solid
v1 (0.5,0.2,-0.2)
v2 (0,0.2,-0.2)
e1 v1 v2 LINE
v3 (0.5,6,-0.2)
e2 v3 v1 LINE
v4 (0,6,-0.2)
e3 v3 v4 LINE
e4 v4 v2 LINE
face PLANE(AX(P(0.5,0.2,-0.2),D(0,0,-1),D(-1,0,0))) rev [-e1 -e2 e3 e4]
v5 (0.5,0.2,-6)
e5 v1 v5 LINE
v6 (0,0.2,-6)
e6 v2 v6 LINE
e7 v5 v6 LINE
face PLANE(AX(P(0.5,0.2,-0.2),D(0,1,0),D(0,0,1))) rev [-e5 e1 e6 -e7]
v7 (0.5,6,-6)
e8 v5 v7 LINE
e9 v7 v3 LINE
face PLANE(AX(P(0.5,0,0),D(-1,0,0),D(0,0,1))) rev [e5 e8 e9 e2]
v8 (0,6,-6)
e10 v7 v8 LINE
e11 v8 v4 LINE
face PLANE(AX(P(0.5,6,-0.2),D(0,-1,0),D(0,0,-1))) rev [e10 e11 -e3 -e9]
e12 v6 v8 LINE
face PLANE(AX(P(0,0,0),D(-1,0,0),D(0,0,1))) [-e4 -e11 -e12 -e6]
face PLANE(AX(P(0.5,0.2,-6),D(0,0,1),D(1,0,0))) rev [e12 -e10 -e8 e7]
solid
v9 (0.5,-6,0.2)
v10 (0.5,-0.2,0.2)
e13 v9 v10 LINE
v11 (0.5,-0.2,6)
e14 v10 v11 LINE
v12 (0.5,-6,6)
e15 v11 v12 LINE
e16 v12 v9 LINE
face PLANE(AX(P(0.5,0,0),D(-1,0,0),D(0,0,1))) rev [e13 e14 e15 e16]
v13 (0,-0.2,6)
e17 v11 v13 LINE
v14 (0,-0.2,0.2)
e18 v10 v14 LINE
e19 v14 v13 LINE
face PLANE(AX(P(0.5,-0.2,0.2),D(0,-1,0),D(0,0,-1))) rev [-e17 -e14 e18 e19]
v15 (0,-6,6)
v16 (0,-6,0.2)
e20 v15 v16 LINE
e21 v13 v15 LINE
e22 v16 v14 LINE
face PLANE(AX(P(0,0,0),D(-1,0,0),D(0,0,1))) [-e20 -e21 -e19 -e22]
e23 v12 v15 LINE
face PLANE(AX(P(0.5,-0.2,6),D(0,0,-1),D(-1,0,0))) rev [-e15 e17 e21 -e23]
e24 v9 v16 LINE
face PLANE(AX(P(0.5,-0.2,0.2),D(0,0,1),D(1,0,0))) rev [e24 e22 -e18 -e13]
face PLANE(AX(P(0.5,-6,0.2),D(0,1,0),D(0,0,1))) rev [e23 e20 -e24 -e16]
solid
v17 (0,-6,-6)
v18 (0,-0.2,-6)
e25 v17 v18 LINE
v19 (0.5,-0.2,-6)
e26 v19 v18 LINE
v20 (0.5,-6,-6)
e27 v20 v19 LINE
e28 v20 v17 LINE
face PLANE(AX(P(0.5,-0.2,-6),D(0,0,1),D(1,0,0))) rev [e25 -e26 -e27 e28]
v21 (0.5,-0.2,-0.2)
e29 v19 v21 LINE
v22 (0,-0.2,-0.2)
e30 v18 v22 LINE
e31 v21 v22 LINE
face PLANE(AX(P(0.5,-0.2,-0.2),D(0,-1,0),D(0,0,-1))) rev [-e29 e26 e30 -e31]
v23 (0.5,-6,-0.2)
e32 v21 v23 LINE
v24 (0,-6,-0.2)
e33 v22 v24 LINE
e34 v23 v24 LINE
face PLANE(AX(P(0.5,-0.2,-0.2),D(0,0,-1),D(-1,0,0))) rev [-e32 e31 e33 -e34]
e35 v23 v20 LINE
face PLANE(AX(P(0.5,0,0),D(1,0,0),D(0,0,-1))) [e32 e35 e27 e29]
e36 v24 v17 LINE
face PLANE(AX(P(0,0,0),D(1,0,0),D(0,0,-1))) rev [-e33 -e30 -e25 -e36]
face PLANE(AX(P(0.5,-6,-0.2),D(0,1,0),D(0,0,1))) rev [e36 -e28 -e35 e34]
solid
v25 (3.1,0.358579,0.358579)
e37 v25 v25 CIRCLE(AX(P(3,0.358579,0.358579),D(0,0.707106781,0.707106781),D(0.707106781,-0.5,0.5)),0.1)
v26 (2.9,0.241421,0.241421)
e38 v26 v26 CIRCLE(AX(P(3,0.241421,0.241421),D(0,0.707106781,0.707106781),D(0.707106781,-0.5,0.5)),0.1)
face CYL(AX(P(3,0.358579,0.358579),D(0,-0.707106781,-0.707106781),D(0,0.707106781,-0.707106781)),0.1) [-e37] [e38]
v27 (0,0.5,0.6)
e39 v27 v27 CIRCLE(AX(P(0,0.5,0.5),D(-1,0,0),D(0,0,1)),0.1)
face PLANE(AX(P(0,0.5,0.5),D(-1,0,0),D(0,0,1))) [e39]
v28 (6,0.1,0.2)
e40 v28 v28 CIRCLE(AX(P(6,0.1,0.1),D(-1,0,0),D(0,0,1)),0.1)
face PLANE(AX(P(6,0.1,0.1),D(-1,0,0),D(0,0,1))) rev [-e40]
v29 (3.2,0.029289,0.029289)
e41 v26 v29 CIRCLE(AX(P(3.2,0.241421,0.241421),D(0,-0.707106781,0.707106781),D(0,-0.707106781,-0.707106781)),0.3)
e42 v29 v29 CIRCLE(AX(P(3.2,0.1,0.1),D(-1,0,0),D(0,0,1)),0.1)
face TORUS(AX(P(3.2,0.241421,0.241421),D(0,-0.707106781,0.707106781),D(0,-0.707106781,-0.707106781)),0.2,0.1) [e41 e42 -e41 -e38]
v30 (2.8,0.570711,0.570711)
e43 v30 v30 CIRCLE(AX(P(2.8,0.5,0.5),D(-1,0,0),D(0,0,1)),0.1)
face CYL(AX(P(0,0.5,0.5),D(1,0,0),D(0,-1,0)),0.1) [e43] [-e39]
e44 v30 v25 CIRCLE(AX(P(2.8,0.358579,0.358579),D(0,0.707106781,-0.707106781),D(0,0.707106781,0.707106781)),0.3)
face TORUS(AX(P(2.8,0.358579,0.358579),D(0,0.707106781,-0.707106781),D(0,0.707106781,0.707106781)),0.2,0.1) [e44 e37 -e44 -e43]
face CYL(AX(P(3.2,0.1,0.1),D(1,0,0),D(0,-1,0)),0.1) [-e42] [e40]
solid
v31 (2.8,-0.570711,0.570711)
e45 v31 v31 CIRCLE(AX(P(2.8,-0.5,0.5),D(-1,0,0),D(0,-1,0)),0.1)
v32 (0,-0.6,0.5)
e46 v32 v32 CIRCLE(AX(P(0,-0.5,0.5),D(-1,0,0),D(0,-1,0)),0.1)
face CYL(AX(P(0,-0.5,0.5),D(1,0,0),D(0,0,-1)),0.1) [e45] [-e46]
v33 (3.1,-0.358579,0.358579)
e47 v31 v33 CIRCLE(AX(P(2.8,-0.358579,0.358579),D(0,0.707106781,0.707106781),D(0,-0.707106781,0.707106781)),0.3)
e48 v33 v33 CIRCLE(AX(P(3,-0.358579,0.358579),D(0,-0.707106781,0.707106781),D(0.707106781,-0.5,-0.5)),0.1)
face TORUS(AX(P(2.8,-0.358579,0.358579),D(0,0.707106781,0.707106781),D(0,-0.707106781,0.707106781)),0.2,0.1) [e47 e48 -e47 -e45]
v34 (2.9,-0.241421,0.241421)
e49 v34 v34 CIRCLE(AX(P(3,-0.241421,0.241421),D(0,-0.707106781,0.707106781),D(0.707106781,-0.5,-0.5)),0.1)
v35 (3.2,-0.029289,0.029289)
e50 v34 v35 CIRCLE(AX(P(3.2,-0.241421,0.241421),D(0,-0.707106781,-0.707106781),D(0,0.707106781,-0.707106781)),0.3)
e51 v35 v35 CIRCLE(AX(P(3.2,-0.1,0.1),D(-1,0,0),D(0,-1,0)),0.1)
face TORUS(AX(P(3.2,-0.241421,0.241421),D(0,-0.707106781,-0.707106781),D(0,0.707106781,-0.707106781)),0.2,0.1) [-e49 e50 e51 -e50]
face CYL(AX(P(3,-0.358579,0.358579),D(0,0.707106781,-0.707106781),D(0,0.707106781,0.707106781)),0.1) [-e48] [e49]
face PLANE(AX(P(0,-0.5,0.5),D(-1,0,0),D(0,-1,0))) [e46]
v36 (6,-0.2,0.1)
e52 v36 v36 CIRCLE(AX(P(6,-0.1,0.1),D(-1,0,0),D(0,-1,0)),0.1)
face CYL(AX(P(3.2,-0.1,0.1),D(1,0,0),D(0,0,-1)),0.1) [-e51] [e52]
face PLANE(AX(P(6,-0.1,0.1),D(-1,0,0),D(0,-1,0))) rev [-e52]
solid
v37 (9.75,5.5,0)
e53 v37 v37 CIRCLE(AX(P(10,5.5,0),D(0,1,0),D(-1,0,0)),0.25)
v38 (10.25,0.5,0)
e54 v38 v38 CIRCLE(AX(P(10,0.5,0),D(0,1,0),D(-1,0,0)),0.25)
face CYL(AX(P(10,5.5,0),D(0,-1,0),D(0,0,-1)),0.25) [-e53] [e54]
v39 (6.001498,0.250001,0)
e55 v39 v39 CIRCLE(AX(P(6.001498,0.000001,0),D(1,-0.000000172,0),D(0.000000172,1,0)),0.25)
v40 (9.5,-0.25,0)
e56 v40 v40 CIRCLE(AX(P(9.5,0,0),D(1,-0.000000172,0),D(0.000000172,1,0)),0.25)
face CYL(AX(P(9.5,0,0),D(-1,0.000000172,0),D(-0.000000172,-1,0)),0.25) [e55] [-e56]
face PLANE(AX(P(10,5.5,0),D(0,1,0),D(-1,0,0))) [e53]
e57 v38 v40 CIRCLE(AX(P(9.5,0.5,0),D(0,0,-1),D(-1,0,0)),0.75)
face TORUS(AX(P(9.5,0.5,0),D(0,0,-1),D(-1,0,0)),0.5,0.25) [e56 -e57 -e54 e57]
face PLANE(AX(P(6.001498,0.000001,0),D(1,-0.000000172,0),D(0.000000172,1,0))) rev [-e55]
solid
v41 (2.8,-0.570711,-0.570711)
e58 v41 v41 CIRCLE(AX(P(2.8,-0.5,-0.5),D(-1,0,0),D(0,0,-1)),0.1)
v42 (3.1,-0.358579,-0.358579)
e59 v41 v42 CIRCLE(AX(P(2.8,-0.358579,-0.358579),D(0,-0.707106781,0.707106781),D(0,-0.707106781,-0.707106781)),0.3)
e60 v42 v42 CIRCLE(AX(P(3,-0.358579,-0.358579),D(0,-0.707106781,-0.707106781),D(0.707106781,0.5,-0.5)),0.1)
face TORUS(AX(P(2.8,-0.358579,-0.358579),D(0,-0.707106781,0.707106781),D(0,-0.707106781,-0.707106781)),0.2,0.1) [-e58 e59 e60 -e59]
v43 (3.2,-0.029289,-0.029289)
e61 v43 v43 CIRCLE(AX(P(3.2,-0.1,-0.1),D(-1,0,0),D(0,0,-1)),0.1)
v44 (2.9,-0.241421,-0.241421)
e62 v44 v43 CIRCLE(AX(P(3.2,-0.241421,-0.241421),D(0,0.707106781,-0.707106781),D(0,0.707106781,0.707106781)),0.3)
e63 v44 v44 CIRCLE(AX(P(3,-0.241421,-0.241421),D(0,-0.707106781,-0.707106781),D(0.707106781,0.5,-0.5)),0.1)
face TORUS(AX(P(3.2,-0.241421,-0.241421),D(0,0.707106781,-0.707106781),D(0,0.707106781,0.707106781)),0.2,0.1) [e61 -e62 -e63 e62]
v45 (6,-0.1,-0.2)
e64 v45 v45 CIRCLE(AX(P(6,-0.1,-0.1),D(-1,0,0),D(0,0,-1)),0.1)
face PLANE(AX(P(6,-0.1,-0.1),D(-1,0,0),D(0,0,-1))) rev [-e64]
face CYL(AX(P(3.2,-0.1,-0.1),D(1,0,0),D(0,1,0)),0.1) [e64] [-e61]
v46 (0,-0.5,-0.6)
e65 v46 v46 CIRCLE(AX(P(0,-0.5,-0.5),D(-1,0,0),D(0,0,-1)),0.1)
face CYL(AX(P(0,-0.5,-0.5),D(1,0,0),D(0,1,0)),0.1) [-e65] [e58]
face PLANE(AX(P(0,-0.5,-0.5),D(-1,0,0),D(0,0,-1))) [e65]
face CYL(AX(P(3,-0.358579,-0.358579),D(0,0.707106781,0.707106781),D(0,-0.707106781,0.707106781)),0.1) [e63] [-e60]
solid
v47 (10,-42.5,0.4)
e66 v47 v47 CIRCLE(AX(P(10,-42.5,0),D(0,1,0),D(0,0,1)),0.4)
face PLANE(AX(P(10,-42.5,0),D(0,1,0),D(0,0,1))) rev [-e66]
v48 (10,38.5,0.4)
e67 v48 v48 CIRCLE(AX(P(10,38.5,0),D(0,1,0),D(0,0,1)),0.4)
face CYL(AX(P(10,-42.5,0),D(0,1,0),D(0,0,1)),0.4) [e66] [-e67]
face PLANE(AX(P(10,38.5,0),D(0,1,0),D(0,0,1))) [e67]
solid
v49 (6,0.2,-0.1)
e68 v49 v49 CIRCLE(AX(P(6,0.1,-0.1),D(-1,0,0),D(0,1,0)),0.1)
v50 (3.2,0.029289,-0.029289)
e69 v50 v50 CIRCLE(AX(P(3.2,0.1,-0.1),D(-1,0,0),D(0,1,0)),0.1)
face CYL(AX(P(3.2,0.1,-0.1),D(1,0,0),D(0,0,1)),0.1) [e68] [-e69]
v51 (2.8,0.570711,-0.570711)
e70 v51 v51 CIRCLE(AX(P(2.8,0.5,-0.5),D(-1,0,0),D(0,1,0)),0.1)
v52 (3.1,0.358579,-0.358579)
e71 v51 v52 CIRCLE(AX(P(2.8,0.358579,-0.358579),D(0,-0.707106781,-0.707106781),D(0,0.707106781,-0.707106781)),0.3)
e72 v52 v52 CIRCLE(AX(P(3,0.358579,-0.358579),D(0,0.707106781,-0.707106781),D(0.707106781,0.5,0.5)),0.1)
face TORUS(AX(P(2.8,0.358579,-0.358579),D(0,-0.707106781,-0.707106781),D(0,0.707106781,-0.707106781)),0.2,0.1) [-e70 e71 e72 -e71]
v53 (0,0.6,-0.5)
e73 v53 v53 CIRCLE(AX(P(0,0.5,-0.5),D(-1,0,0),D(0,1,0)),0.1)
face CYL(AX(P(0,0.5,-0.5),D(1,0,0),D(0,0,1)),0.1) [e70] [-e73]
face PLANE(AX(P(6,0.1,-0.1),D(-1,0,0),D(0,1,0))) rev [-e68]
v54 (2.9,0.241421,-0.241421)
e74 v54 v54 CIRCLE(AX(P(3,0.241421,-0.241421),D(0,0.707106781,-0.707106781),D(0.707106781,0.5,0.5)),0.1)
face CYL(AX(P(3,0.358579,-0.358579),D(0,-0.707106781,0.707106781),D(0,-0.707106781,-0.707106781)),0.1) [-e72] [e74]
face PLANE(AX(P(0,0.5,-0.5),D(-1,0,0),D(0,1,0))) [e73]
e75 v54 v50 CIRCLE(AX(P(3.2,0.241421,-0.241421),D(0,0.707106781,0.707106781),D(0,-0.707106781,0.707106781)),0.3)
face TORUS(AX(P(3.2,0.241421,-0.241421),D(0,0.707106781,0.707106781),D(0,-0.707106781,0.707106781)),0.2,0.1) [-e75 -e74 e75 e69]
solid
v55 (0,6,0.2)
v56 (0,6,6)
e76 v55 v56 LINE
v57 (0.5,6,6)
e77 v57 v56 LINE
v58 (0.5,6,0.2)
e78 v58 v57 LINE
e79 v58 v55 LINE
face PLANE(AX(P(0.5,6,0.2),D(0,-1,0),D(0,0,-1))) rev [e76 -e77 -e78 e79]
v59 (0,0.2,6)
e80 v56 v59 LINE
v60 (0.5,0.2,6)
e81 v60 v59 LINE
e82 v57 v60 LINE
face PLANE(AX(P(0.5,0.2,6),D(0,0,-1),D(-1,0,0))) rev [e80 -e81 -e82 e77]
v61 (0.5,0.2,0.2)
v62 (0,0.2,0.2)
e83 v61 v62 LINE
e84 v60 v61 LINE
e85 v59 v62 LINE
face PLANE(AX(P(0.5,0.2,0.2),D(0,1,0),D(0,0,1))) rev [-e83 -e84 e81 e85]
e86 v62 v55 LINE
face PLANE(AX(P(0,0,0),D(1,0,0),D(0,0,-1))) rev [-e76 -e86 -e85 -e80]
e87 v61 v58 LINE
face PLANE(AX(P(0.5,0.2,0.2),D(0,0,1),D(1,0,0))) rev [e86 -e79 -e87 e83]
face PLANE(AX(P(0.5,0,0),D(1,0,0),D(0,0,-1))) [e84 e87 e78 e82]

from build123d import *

# Parameters (mm, degrees)
SKETCH_3_W               = 5.8
SKETCH_3_H               = 5.8
EXTRUDE_1_DEPTH          = 0.5
EXTRUDE_1_2_DEPTH        = 0.5
EXTRUDE_1_3_DEPTH        = 0.5
EXTRUDE_1_4_DEPTH        = 0.5
SWEEP_4_PROFILE_R        = 0.1
SWEEP_6_PROFILE_R        = 0.25
SWEEP_8_PROFILE_R        = 0.4
MOVE_BODY_3_OUTLINE_R    = 0.1
MOVE_BODY_3_ANGLE        = 90
MOVE_BODY_3_2_OUTLINE_R  = 0.1
MOVE_BODY_3_2_ANGLE      = 90
MOVE_BODY_3_3_OUTLINE_R  = 0.1
MOVE_BODY_3_3_DEPTH      = 2.8000001
MOVE_START               = 0.341421256
MOVE_BODY_3_4_OUTLINE_R  = 0.1
MOVE_BODY_3_4_DEPTH      = 0.165685625
MOVE_START_2             = 3.1999999
MOVE_BODY_3_5_OUTLINE_R  = 0.1
MOVE_BODY_3_5_DEPTH      = 2.8000001
MOVE_BODY_3_6_OUTLINE_R  = 0.1
MOVE_BODY_3_6_ANGLE      = 90
MOVE_BODY_3_7_OUTLINE_R  = 0.1
MOVE_BODY_3_7_ANGLE      = 90
MOVE_BODY_3_8_OUTLINE_R  = 0.1
MOVE_BODY_3_8_DEPTH      = 2.8000001
MOVE_BODY_3_9_OUTLINE_R  = 0.1
MOVE_BODY_3_9_DEPTH      = 0.165685625
MOVE_BODY_3_10_OUTLINE_R = 0.1
MOVE_BODY_3_10_DEPTH     = 2.8000001
MOVE_BODY_3_11_OUTLINE_R = 0.1
MOVE_BODY_3_11_ANGLE     = 90
MOVE_BODY_3_12_OUTLINE_R = 0.1
MOVE_BODY_3_12_ANGLE     = 90
MOVE_BODY_3_13_OUTLINE_R = 0.1
MOVE_BODY_3_13_DEPTH     = 2.8000001
MOVE_START_3             = -0.507106881
MOVE_BODY_3_14_OUTLINE_R = 0.1
MOVE_BODY_3_14_DEPTH     = 0.165685625
MOVE_BODY_3_15_OUTLINE_R = 0.1
MOVE_BODY_3_15_DEPTH     = 2.8000001


with BuildPart() as part:
    # 草图3 → 凸台-拉伸1 (new body)
    with BuildSketch(Plane(origin=(0, 0, 0), x_dir=(0, 0, -1), z_dir=(1, 0, 0))):
        with Locations((3.1, 3.1)):
            Rectangle(SKETCH_3_W, SKETCH_3_H)
    extrude(amount=EXTRUDE_1_DEPTH)


with BuildPart() as body_2:
    # 草图3 → Extrude 1 2 (new body)
    with BuildSketch(Plane(origin=(0, 0, 0), x_dir=(0, 0, -1), z_dir=(1, 0, 0))):
        with Locations((-3.1, -3.1)):
            Rectangle(SKETCH_3_W, SKETCH_3_H)
    extrude(amount=EXTRUDE_1_2_DEPTH)


with BuildPart() as body_3:
    # 草图3 → Extrude 1 3 (new body)
    with BuildSketch(Plane(origin=(0, 0, 0), x_dir=(0, 0, -1), z_dir=(1, 0, 0))):
        with Locations((3.1, -3.1)):
            Rectangle(SKETCH_3_W, SKETCH_3_H)
    extrude(amount=EXTRUDE_1_3_DEPTH)


with BuildPart() as body_4:
    # 草图3 → Extrude 1 4 (new body)
    with BuildSketch(Plane(origin=(0, 0, 0), x_dir=(0, 0, -1), z_dir=(1, 0, 0))):
        with Locations((-3.1, 3.1)):
            Rectangle(SKETCH_3_W, SKETCH_3_H)
    extrude(amount=EXTRUDE_1_4_DEPTH)


with BuildPart() as body_5:
    # 扫描4: sweep along a curve in space
    with BuildLine() as sweep_4_path:
        Line((0, -0.5, 0.5), (2.8, -0.5, 0.5))
        ThreePointArc((2.8, -0.5, 0.5), (2.941421356, -0.458578644, 0.458578644), (3, -0.358578644, 0.358578644))
        Line((3, -0.241421356, 0.241421356), (3, -0.358578644, 0.358578644))
        ThreePointArc((3.2, -0.1, 0.1), (3.058578644, -0.141421356, 0.141421356), (3, -0.241421356, 0.241421356))
        Line((3.2, -0.1, 0.1), (6, -0.1, 0.1))
    # 扫描4 profile (on start of the path) → 扫描4 (sweep)
    with BuildSketch(Plane(origin=(0, -0.5, 0.5), x_dir=(0, 0, 1), z_dir=(1, 0, 0))):
        Circle(SWEEP_4_PROFILE_R)
    sweep(path=sweep_4_path.line)


with BuildPart() as body_6:
    # 扫描6: sweep along a path in 草图31
    with BuildLine(Plane.XY) as sweep_6_path:
        Line((10, 5.5), (10, 0.5))
        ThreePointArc((10, 0.5), (9.85355336, 0.146446579), (9.499999914, 0))
        Line((9.499999914, 0), (6.001497631, 6.02e-07))
    # 扫描6 profile (on start of the path) → 扫描6 (sweep)
    with BuildSketch(Plane(origin=(10, 5.5, 0), x_dir=(0, 0, -1), z_dir=(0, -1, 0))):
        Circle(SWEEP_6_PROFILE_R)
    sweep(path=sweep_6_path.line)


with BuildPart() as body_7:
    # 扫描8: sweep along a path in 草图39
    with BuildLine(Plane.XY) as sweep_8_path:
        Line((10, -42.5), (10, 38.5))
    # 扫描8 profile (on start of the path) → 扫描8 (sweep)
    with BuildSketch(Plane(origin=(10, -42.5, 0), x_dir=(0, 0, 1), z_dir=(0, 1, 0))):
        Circle(SWEEP_8_PROFILE_R)
    sweep(path=sweep_8_path.line)


with BuildPart() as body_8:
    # Move Body 3: read off the stored shape, not the designer's step
    # Move Body 3 outline → Move Body 3 (revolve)
    with BuildSketch(Plane(origin=(2.8, 0.358578644, 0.358578644), x_dir=(0, 0.7071067811865401, 0.7071067811865551), z_dir=(-1, 0, 0))):
        with Locations((0.2, 0)):
            Circle(MOVE_BODY_3_OUTLINE_R)
    revolve(axis=Axis((2.8, 0.358578644, 0.358578644), (0, 0.7071067811865555, -0.7071067811865405)), revolution_arc=MOVE_BODY_3_ANGLE)

    # Move Body 3 2 outline → Move Body 3 2 (revolve)
    with BuildSketch(Plane(origin=(3.2, 0.241421356, 0.241421356), x_dir=(1.3934999695075554e-15, -0.7071067811865401, -0.7071067811865551), z_dir=(1, 0, 0))):
        with Locations((0.2, 0)):
            Circle(MOVE_BODY_3_2_OUTLINE_R)
    revolve(axis=Axis((3.2, 0.241421356, 0.241421356), (0, 0.7071067811865555, -0.7071067811865405)), revolution_arc=MOVE_BODY_3_2_ANGLE)

    # Move Body 3 3 outline → Move Body 3 3 (add)
    with BuildSketch(Plane.YZ):
        with Locations((0.5, 0.5)):
            Circle(MOVE_BODY_3_3_OUTLINE_R)
    extrude(amount=MOVE_BODY_3_3_DEPTH)

    # Move Body 3 4 outline → Move Body 3 4 (add)
    with BuildSketch(Plane(origin=(0, 0, 0), x_dir=(1, 0, 0), z_dir=(0, 0.70710678118654, 0.707106781186555)).offset(MOVE_START)):
        with Locations((3, 0)):
            Circle(MOVE_BODY_3_4_OUTLINE_R)
    extrude(amount=MOVE_BODY_3_4_DEPTH)

    # Move Body 3 5 outline → Move Body 3 5 (add)
    with BuildSketch(Plane.YZ.offset(MOVE_START_2)):
        with Locations((0.1, 0.1)):
            Circle(MOVE_BODY_3_5_OUTLINE_R)
    extrude(amount=MOVE_BODY_3_5_DEPTH)


with BuildPart() as body_9:
    # Move Body 3 6 outline → Move Body 3 6 (revolve)
    with BuildSketch(Plane(origin=(2.8, 0.358578644, -0.358578644), x_dir=(1, 0, 0), z_dir=(0, -0.707106781186552, 0.707106781186543))):
        with Locations((0.2, 0)):
            Circle(MOVE_BODY_3_6_OUTLINE_R)
    revolve(axis=Axis((2.8, 0.358578644, -0.358578644), (0, 0.707106781186543, 0.707106781186552)), revolution_arc=MOVE_BODY_3_6_ANGLE)

    # Move Body 3 7 outline → Move Body 3 7 (revolve)
    with BuildSketch(Plane(origin=(3.2, 0.241421356, -0.241421356), x_dir=(-1, 0, 0), z_dir=(-1.0106430996148604e-15, 0.707106781186552, -0.707106781186543))):
        with Locations((0.2, 0)):
            Circle(MOVE_BODY_3_7_OUTLINE_R)
    revolve(axis=Axis((3.2, 0.241421356, -0.241421356), (0, 0.707106781186543, 0.707106781186552)), revolution_arc=MOVE_BODY_3_7_ANGLE)

    # Move Body 3 8 outline → Move Body 3 8 (add)
    with BuildSketch(Plane.YZ):
        with Locations((0.5, -0.5)):
            Circle(MOVE_BODY_3_8_OUTLINE_R)
    extrude(amount=MOVE_BODY_3_8_DEPTH)

    # Move Body 3 9 outline → Move Body 3 9 (add)
    with BuildSketch(Plane(origin=(0, 0, 0), x_dir=(1, 0, 0), z_dir=(0, 0.707106781186552, -0.707106781186543)).offset(MOVE_START)):
        with Locations((3, 0)):
            Circle(MOVE_BODY_3_9_OUTLINE_R)
    extrude(amount=MOVE_BODY_3_9_DEPTH)

    # Move Body 3 10 outline → Move Body 3 10 (add)
    with BuildSketch(Plane.YZ.offset(MOVE_START_2)):
        with Locations((0.1, -0.1)):
            Circle(MOVE_BODY_3_10_OUTLINE_R)
    extrude(amount=MOVE_BODY_3_10_DEPTH)


with BuildPart() as body_10:
    # Move Body 3 11 outline → Move Body 3 11 (revolve)
    with BuildSketch(Plane(origin=(2.8, -0.358578644, -0.358578644), x_dir=(1, 0, 0), z_dir=(0, 0.707106781186545, 0.70710678118655))):
        with Locations((0.2, 0)):
            Circle(MOVE_BODY_3_11_OUTLINE_R)
    revolve(axis=Axis((2.8, -0.358578644, -0.358578644), (0, 0.70710678118655, -0.707106781186545)), revolution_arc=MOVE_BODY_3_11_ANGLE)

    # Move Body 3 12 outline → Move Body 3 12 (revolve)
    with BuildSketch(Plane(origin=(3.2, -0.241421356, -0.241421356), x_dir=(-1, 0, 0), z_dir=(-1.0106430996148606e-15, -0.707106781186545, -0.70710678118655))):
        with Locations((0.2, 0)):
            Circle(MOVE_BODY_3_12_OUTLINE_R)
    revolve(axis=Axis((3.2, -0.241421356, -0.241421356), (0, 0.70710678118655, -0.707106781186545)), revolution_arc=MOVE_BODY_3_12_ANGLE)

    # Move Body 3 13 outline → Move Body 3 13 (add)
    with BuildSketch(Plane.YZ):
        with Locations((-0.5, -0.5)):
            Circle(MOVE_BODY_3_13_OUTLINE_R)
    extrude(amount=MOVE_BODY_3_13_DEPTH)

    # Move Body 3 14 outline → Move Body 3 14 (add)
    with BuildSketch(Plane(origin=(0, 0, 0), x_dir=(1, 0, 0), z_dir=(0, 0.707106781186545, 0.70710678118655)).offset(MOVE_START_3)):
        with Locations((3, 0)):
            Circle(MOVE_BODY_3_14_OUTLINE_R)
    extrude(amount=MOVE_BODY_3_14_DEPTH)

    # Move Body 3 15 outline → Move Body 3 15 (add)
    with BuildSketch(Plane.YZ.offset(MOVE_START_2)):
        with Locations((-0.1, -0.1)):
            Circle(MOVE_BODY_3_15_OUTLINE_R)
    extrude(amount=MOVE_BODY_3_15_DEPTH)


solid = Compound([part.part, body_2.part, body_3.part, body_4.part, body_5.part, body_6.part, body_7.part, body_8.part, body_9.part, body_10.part])
